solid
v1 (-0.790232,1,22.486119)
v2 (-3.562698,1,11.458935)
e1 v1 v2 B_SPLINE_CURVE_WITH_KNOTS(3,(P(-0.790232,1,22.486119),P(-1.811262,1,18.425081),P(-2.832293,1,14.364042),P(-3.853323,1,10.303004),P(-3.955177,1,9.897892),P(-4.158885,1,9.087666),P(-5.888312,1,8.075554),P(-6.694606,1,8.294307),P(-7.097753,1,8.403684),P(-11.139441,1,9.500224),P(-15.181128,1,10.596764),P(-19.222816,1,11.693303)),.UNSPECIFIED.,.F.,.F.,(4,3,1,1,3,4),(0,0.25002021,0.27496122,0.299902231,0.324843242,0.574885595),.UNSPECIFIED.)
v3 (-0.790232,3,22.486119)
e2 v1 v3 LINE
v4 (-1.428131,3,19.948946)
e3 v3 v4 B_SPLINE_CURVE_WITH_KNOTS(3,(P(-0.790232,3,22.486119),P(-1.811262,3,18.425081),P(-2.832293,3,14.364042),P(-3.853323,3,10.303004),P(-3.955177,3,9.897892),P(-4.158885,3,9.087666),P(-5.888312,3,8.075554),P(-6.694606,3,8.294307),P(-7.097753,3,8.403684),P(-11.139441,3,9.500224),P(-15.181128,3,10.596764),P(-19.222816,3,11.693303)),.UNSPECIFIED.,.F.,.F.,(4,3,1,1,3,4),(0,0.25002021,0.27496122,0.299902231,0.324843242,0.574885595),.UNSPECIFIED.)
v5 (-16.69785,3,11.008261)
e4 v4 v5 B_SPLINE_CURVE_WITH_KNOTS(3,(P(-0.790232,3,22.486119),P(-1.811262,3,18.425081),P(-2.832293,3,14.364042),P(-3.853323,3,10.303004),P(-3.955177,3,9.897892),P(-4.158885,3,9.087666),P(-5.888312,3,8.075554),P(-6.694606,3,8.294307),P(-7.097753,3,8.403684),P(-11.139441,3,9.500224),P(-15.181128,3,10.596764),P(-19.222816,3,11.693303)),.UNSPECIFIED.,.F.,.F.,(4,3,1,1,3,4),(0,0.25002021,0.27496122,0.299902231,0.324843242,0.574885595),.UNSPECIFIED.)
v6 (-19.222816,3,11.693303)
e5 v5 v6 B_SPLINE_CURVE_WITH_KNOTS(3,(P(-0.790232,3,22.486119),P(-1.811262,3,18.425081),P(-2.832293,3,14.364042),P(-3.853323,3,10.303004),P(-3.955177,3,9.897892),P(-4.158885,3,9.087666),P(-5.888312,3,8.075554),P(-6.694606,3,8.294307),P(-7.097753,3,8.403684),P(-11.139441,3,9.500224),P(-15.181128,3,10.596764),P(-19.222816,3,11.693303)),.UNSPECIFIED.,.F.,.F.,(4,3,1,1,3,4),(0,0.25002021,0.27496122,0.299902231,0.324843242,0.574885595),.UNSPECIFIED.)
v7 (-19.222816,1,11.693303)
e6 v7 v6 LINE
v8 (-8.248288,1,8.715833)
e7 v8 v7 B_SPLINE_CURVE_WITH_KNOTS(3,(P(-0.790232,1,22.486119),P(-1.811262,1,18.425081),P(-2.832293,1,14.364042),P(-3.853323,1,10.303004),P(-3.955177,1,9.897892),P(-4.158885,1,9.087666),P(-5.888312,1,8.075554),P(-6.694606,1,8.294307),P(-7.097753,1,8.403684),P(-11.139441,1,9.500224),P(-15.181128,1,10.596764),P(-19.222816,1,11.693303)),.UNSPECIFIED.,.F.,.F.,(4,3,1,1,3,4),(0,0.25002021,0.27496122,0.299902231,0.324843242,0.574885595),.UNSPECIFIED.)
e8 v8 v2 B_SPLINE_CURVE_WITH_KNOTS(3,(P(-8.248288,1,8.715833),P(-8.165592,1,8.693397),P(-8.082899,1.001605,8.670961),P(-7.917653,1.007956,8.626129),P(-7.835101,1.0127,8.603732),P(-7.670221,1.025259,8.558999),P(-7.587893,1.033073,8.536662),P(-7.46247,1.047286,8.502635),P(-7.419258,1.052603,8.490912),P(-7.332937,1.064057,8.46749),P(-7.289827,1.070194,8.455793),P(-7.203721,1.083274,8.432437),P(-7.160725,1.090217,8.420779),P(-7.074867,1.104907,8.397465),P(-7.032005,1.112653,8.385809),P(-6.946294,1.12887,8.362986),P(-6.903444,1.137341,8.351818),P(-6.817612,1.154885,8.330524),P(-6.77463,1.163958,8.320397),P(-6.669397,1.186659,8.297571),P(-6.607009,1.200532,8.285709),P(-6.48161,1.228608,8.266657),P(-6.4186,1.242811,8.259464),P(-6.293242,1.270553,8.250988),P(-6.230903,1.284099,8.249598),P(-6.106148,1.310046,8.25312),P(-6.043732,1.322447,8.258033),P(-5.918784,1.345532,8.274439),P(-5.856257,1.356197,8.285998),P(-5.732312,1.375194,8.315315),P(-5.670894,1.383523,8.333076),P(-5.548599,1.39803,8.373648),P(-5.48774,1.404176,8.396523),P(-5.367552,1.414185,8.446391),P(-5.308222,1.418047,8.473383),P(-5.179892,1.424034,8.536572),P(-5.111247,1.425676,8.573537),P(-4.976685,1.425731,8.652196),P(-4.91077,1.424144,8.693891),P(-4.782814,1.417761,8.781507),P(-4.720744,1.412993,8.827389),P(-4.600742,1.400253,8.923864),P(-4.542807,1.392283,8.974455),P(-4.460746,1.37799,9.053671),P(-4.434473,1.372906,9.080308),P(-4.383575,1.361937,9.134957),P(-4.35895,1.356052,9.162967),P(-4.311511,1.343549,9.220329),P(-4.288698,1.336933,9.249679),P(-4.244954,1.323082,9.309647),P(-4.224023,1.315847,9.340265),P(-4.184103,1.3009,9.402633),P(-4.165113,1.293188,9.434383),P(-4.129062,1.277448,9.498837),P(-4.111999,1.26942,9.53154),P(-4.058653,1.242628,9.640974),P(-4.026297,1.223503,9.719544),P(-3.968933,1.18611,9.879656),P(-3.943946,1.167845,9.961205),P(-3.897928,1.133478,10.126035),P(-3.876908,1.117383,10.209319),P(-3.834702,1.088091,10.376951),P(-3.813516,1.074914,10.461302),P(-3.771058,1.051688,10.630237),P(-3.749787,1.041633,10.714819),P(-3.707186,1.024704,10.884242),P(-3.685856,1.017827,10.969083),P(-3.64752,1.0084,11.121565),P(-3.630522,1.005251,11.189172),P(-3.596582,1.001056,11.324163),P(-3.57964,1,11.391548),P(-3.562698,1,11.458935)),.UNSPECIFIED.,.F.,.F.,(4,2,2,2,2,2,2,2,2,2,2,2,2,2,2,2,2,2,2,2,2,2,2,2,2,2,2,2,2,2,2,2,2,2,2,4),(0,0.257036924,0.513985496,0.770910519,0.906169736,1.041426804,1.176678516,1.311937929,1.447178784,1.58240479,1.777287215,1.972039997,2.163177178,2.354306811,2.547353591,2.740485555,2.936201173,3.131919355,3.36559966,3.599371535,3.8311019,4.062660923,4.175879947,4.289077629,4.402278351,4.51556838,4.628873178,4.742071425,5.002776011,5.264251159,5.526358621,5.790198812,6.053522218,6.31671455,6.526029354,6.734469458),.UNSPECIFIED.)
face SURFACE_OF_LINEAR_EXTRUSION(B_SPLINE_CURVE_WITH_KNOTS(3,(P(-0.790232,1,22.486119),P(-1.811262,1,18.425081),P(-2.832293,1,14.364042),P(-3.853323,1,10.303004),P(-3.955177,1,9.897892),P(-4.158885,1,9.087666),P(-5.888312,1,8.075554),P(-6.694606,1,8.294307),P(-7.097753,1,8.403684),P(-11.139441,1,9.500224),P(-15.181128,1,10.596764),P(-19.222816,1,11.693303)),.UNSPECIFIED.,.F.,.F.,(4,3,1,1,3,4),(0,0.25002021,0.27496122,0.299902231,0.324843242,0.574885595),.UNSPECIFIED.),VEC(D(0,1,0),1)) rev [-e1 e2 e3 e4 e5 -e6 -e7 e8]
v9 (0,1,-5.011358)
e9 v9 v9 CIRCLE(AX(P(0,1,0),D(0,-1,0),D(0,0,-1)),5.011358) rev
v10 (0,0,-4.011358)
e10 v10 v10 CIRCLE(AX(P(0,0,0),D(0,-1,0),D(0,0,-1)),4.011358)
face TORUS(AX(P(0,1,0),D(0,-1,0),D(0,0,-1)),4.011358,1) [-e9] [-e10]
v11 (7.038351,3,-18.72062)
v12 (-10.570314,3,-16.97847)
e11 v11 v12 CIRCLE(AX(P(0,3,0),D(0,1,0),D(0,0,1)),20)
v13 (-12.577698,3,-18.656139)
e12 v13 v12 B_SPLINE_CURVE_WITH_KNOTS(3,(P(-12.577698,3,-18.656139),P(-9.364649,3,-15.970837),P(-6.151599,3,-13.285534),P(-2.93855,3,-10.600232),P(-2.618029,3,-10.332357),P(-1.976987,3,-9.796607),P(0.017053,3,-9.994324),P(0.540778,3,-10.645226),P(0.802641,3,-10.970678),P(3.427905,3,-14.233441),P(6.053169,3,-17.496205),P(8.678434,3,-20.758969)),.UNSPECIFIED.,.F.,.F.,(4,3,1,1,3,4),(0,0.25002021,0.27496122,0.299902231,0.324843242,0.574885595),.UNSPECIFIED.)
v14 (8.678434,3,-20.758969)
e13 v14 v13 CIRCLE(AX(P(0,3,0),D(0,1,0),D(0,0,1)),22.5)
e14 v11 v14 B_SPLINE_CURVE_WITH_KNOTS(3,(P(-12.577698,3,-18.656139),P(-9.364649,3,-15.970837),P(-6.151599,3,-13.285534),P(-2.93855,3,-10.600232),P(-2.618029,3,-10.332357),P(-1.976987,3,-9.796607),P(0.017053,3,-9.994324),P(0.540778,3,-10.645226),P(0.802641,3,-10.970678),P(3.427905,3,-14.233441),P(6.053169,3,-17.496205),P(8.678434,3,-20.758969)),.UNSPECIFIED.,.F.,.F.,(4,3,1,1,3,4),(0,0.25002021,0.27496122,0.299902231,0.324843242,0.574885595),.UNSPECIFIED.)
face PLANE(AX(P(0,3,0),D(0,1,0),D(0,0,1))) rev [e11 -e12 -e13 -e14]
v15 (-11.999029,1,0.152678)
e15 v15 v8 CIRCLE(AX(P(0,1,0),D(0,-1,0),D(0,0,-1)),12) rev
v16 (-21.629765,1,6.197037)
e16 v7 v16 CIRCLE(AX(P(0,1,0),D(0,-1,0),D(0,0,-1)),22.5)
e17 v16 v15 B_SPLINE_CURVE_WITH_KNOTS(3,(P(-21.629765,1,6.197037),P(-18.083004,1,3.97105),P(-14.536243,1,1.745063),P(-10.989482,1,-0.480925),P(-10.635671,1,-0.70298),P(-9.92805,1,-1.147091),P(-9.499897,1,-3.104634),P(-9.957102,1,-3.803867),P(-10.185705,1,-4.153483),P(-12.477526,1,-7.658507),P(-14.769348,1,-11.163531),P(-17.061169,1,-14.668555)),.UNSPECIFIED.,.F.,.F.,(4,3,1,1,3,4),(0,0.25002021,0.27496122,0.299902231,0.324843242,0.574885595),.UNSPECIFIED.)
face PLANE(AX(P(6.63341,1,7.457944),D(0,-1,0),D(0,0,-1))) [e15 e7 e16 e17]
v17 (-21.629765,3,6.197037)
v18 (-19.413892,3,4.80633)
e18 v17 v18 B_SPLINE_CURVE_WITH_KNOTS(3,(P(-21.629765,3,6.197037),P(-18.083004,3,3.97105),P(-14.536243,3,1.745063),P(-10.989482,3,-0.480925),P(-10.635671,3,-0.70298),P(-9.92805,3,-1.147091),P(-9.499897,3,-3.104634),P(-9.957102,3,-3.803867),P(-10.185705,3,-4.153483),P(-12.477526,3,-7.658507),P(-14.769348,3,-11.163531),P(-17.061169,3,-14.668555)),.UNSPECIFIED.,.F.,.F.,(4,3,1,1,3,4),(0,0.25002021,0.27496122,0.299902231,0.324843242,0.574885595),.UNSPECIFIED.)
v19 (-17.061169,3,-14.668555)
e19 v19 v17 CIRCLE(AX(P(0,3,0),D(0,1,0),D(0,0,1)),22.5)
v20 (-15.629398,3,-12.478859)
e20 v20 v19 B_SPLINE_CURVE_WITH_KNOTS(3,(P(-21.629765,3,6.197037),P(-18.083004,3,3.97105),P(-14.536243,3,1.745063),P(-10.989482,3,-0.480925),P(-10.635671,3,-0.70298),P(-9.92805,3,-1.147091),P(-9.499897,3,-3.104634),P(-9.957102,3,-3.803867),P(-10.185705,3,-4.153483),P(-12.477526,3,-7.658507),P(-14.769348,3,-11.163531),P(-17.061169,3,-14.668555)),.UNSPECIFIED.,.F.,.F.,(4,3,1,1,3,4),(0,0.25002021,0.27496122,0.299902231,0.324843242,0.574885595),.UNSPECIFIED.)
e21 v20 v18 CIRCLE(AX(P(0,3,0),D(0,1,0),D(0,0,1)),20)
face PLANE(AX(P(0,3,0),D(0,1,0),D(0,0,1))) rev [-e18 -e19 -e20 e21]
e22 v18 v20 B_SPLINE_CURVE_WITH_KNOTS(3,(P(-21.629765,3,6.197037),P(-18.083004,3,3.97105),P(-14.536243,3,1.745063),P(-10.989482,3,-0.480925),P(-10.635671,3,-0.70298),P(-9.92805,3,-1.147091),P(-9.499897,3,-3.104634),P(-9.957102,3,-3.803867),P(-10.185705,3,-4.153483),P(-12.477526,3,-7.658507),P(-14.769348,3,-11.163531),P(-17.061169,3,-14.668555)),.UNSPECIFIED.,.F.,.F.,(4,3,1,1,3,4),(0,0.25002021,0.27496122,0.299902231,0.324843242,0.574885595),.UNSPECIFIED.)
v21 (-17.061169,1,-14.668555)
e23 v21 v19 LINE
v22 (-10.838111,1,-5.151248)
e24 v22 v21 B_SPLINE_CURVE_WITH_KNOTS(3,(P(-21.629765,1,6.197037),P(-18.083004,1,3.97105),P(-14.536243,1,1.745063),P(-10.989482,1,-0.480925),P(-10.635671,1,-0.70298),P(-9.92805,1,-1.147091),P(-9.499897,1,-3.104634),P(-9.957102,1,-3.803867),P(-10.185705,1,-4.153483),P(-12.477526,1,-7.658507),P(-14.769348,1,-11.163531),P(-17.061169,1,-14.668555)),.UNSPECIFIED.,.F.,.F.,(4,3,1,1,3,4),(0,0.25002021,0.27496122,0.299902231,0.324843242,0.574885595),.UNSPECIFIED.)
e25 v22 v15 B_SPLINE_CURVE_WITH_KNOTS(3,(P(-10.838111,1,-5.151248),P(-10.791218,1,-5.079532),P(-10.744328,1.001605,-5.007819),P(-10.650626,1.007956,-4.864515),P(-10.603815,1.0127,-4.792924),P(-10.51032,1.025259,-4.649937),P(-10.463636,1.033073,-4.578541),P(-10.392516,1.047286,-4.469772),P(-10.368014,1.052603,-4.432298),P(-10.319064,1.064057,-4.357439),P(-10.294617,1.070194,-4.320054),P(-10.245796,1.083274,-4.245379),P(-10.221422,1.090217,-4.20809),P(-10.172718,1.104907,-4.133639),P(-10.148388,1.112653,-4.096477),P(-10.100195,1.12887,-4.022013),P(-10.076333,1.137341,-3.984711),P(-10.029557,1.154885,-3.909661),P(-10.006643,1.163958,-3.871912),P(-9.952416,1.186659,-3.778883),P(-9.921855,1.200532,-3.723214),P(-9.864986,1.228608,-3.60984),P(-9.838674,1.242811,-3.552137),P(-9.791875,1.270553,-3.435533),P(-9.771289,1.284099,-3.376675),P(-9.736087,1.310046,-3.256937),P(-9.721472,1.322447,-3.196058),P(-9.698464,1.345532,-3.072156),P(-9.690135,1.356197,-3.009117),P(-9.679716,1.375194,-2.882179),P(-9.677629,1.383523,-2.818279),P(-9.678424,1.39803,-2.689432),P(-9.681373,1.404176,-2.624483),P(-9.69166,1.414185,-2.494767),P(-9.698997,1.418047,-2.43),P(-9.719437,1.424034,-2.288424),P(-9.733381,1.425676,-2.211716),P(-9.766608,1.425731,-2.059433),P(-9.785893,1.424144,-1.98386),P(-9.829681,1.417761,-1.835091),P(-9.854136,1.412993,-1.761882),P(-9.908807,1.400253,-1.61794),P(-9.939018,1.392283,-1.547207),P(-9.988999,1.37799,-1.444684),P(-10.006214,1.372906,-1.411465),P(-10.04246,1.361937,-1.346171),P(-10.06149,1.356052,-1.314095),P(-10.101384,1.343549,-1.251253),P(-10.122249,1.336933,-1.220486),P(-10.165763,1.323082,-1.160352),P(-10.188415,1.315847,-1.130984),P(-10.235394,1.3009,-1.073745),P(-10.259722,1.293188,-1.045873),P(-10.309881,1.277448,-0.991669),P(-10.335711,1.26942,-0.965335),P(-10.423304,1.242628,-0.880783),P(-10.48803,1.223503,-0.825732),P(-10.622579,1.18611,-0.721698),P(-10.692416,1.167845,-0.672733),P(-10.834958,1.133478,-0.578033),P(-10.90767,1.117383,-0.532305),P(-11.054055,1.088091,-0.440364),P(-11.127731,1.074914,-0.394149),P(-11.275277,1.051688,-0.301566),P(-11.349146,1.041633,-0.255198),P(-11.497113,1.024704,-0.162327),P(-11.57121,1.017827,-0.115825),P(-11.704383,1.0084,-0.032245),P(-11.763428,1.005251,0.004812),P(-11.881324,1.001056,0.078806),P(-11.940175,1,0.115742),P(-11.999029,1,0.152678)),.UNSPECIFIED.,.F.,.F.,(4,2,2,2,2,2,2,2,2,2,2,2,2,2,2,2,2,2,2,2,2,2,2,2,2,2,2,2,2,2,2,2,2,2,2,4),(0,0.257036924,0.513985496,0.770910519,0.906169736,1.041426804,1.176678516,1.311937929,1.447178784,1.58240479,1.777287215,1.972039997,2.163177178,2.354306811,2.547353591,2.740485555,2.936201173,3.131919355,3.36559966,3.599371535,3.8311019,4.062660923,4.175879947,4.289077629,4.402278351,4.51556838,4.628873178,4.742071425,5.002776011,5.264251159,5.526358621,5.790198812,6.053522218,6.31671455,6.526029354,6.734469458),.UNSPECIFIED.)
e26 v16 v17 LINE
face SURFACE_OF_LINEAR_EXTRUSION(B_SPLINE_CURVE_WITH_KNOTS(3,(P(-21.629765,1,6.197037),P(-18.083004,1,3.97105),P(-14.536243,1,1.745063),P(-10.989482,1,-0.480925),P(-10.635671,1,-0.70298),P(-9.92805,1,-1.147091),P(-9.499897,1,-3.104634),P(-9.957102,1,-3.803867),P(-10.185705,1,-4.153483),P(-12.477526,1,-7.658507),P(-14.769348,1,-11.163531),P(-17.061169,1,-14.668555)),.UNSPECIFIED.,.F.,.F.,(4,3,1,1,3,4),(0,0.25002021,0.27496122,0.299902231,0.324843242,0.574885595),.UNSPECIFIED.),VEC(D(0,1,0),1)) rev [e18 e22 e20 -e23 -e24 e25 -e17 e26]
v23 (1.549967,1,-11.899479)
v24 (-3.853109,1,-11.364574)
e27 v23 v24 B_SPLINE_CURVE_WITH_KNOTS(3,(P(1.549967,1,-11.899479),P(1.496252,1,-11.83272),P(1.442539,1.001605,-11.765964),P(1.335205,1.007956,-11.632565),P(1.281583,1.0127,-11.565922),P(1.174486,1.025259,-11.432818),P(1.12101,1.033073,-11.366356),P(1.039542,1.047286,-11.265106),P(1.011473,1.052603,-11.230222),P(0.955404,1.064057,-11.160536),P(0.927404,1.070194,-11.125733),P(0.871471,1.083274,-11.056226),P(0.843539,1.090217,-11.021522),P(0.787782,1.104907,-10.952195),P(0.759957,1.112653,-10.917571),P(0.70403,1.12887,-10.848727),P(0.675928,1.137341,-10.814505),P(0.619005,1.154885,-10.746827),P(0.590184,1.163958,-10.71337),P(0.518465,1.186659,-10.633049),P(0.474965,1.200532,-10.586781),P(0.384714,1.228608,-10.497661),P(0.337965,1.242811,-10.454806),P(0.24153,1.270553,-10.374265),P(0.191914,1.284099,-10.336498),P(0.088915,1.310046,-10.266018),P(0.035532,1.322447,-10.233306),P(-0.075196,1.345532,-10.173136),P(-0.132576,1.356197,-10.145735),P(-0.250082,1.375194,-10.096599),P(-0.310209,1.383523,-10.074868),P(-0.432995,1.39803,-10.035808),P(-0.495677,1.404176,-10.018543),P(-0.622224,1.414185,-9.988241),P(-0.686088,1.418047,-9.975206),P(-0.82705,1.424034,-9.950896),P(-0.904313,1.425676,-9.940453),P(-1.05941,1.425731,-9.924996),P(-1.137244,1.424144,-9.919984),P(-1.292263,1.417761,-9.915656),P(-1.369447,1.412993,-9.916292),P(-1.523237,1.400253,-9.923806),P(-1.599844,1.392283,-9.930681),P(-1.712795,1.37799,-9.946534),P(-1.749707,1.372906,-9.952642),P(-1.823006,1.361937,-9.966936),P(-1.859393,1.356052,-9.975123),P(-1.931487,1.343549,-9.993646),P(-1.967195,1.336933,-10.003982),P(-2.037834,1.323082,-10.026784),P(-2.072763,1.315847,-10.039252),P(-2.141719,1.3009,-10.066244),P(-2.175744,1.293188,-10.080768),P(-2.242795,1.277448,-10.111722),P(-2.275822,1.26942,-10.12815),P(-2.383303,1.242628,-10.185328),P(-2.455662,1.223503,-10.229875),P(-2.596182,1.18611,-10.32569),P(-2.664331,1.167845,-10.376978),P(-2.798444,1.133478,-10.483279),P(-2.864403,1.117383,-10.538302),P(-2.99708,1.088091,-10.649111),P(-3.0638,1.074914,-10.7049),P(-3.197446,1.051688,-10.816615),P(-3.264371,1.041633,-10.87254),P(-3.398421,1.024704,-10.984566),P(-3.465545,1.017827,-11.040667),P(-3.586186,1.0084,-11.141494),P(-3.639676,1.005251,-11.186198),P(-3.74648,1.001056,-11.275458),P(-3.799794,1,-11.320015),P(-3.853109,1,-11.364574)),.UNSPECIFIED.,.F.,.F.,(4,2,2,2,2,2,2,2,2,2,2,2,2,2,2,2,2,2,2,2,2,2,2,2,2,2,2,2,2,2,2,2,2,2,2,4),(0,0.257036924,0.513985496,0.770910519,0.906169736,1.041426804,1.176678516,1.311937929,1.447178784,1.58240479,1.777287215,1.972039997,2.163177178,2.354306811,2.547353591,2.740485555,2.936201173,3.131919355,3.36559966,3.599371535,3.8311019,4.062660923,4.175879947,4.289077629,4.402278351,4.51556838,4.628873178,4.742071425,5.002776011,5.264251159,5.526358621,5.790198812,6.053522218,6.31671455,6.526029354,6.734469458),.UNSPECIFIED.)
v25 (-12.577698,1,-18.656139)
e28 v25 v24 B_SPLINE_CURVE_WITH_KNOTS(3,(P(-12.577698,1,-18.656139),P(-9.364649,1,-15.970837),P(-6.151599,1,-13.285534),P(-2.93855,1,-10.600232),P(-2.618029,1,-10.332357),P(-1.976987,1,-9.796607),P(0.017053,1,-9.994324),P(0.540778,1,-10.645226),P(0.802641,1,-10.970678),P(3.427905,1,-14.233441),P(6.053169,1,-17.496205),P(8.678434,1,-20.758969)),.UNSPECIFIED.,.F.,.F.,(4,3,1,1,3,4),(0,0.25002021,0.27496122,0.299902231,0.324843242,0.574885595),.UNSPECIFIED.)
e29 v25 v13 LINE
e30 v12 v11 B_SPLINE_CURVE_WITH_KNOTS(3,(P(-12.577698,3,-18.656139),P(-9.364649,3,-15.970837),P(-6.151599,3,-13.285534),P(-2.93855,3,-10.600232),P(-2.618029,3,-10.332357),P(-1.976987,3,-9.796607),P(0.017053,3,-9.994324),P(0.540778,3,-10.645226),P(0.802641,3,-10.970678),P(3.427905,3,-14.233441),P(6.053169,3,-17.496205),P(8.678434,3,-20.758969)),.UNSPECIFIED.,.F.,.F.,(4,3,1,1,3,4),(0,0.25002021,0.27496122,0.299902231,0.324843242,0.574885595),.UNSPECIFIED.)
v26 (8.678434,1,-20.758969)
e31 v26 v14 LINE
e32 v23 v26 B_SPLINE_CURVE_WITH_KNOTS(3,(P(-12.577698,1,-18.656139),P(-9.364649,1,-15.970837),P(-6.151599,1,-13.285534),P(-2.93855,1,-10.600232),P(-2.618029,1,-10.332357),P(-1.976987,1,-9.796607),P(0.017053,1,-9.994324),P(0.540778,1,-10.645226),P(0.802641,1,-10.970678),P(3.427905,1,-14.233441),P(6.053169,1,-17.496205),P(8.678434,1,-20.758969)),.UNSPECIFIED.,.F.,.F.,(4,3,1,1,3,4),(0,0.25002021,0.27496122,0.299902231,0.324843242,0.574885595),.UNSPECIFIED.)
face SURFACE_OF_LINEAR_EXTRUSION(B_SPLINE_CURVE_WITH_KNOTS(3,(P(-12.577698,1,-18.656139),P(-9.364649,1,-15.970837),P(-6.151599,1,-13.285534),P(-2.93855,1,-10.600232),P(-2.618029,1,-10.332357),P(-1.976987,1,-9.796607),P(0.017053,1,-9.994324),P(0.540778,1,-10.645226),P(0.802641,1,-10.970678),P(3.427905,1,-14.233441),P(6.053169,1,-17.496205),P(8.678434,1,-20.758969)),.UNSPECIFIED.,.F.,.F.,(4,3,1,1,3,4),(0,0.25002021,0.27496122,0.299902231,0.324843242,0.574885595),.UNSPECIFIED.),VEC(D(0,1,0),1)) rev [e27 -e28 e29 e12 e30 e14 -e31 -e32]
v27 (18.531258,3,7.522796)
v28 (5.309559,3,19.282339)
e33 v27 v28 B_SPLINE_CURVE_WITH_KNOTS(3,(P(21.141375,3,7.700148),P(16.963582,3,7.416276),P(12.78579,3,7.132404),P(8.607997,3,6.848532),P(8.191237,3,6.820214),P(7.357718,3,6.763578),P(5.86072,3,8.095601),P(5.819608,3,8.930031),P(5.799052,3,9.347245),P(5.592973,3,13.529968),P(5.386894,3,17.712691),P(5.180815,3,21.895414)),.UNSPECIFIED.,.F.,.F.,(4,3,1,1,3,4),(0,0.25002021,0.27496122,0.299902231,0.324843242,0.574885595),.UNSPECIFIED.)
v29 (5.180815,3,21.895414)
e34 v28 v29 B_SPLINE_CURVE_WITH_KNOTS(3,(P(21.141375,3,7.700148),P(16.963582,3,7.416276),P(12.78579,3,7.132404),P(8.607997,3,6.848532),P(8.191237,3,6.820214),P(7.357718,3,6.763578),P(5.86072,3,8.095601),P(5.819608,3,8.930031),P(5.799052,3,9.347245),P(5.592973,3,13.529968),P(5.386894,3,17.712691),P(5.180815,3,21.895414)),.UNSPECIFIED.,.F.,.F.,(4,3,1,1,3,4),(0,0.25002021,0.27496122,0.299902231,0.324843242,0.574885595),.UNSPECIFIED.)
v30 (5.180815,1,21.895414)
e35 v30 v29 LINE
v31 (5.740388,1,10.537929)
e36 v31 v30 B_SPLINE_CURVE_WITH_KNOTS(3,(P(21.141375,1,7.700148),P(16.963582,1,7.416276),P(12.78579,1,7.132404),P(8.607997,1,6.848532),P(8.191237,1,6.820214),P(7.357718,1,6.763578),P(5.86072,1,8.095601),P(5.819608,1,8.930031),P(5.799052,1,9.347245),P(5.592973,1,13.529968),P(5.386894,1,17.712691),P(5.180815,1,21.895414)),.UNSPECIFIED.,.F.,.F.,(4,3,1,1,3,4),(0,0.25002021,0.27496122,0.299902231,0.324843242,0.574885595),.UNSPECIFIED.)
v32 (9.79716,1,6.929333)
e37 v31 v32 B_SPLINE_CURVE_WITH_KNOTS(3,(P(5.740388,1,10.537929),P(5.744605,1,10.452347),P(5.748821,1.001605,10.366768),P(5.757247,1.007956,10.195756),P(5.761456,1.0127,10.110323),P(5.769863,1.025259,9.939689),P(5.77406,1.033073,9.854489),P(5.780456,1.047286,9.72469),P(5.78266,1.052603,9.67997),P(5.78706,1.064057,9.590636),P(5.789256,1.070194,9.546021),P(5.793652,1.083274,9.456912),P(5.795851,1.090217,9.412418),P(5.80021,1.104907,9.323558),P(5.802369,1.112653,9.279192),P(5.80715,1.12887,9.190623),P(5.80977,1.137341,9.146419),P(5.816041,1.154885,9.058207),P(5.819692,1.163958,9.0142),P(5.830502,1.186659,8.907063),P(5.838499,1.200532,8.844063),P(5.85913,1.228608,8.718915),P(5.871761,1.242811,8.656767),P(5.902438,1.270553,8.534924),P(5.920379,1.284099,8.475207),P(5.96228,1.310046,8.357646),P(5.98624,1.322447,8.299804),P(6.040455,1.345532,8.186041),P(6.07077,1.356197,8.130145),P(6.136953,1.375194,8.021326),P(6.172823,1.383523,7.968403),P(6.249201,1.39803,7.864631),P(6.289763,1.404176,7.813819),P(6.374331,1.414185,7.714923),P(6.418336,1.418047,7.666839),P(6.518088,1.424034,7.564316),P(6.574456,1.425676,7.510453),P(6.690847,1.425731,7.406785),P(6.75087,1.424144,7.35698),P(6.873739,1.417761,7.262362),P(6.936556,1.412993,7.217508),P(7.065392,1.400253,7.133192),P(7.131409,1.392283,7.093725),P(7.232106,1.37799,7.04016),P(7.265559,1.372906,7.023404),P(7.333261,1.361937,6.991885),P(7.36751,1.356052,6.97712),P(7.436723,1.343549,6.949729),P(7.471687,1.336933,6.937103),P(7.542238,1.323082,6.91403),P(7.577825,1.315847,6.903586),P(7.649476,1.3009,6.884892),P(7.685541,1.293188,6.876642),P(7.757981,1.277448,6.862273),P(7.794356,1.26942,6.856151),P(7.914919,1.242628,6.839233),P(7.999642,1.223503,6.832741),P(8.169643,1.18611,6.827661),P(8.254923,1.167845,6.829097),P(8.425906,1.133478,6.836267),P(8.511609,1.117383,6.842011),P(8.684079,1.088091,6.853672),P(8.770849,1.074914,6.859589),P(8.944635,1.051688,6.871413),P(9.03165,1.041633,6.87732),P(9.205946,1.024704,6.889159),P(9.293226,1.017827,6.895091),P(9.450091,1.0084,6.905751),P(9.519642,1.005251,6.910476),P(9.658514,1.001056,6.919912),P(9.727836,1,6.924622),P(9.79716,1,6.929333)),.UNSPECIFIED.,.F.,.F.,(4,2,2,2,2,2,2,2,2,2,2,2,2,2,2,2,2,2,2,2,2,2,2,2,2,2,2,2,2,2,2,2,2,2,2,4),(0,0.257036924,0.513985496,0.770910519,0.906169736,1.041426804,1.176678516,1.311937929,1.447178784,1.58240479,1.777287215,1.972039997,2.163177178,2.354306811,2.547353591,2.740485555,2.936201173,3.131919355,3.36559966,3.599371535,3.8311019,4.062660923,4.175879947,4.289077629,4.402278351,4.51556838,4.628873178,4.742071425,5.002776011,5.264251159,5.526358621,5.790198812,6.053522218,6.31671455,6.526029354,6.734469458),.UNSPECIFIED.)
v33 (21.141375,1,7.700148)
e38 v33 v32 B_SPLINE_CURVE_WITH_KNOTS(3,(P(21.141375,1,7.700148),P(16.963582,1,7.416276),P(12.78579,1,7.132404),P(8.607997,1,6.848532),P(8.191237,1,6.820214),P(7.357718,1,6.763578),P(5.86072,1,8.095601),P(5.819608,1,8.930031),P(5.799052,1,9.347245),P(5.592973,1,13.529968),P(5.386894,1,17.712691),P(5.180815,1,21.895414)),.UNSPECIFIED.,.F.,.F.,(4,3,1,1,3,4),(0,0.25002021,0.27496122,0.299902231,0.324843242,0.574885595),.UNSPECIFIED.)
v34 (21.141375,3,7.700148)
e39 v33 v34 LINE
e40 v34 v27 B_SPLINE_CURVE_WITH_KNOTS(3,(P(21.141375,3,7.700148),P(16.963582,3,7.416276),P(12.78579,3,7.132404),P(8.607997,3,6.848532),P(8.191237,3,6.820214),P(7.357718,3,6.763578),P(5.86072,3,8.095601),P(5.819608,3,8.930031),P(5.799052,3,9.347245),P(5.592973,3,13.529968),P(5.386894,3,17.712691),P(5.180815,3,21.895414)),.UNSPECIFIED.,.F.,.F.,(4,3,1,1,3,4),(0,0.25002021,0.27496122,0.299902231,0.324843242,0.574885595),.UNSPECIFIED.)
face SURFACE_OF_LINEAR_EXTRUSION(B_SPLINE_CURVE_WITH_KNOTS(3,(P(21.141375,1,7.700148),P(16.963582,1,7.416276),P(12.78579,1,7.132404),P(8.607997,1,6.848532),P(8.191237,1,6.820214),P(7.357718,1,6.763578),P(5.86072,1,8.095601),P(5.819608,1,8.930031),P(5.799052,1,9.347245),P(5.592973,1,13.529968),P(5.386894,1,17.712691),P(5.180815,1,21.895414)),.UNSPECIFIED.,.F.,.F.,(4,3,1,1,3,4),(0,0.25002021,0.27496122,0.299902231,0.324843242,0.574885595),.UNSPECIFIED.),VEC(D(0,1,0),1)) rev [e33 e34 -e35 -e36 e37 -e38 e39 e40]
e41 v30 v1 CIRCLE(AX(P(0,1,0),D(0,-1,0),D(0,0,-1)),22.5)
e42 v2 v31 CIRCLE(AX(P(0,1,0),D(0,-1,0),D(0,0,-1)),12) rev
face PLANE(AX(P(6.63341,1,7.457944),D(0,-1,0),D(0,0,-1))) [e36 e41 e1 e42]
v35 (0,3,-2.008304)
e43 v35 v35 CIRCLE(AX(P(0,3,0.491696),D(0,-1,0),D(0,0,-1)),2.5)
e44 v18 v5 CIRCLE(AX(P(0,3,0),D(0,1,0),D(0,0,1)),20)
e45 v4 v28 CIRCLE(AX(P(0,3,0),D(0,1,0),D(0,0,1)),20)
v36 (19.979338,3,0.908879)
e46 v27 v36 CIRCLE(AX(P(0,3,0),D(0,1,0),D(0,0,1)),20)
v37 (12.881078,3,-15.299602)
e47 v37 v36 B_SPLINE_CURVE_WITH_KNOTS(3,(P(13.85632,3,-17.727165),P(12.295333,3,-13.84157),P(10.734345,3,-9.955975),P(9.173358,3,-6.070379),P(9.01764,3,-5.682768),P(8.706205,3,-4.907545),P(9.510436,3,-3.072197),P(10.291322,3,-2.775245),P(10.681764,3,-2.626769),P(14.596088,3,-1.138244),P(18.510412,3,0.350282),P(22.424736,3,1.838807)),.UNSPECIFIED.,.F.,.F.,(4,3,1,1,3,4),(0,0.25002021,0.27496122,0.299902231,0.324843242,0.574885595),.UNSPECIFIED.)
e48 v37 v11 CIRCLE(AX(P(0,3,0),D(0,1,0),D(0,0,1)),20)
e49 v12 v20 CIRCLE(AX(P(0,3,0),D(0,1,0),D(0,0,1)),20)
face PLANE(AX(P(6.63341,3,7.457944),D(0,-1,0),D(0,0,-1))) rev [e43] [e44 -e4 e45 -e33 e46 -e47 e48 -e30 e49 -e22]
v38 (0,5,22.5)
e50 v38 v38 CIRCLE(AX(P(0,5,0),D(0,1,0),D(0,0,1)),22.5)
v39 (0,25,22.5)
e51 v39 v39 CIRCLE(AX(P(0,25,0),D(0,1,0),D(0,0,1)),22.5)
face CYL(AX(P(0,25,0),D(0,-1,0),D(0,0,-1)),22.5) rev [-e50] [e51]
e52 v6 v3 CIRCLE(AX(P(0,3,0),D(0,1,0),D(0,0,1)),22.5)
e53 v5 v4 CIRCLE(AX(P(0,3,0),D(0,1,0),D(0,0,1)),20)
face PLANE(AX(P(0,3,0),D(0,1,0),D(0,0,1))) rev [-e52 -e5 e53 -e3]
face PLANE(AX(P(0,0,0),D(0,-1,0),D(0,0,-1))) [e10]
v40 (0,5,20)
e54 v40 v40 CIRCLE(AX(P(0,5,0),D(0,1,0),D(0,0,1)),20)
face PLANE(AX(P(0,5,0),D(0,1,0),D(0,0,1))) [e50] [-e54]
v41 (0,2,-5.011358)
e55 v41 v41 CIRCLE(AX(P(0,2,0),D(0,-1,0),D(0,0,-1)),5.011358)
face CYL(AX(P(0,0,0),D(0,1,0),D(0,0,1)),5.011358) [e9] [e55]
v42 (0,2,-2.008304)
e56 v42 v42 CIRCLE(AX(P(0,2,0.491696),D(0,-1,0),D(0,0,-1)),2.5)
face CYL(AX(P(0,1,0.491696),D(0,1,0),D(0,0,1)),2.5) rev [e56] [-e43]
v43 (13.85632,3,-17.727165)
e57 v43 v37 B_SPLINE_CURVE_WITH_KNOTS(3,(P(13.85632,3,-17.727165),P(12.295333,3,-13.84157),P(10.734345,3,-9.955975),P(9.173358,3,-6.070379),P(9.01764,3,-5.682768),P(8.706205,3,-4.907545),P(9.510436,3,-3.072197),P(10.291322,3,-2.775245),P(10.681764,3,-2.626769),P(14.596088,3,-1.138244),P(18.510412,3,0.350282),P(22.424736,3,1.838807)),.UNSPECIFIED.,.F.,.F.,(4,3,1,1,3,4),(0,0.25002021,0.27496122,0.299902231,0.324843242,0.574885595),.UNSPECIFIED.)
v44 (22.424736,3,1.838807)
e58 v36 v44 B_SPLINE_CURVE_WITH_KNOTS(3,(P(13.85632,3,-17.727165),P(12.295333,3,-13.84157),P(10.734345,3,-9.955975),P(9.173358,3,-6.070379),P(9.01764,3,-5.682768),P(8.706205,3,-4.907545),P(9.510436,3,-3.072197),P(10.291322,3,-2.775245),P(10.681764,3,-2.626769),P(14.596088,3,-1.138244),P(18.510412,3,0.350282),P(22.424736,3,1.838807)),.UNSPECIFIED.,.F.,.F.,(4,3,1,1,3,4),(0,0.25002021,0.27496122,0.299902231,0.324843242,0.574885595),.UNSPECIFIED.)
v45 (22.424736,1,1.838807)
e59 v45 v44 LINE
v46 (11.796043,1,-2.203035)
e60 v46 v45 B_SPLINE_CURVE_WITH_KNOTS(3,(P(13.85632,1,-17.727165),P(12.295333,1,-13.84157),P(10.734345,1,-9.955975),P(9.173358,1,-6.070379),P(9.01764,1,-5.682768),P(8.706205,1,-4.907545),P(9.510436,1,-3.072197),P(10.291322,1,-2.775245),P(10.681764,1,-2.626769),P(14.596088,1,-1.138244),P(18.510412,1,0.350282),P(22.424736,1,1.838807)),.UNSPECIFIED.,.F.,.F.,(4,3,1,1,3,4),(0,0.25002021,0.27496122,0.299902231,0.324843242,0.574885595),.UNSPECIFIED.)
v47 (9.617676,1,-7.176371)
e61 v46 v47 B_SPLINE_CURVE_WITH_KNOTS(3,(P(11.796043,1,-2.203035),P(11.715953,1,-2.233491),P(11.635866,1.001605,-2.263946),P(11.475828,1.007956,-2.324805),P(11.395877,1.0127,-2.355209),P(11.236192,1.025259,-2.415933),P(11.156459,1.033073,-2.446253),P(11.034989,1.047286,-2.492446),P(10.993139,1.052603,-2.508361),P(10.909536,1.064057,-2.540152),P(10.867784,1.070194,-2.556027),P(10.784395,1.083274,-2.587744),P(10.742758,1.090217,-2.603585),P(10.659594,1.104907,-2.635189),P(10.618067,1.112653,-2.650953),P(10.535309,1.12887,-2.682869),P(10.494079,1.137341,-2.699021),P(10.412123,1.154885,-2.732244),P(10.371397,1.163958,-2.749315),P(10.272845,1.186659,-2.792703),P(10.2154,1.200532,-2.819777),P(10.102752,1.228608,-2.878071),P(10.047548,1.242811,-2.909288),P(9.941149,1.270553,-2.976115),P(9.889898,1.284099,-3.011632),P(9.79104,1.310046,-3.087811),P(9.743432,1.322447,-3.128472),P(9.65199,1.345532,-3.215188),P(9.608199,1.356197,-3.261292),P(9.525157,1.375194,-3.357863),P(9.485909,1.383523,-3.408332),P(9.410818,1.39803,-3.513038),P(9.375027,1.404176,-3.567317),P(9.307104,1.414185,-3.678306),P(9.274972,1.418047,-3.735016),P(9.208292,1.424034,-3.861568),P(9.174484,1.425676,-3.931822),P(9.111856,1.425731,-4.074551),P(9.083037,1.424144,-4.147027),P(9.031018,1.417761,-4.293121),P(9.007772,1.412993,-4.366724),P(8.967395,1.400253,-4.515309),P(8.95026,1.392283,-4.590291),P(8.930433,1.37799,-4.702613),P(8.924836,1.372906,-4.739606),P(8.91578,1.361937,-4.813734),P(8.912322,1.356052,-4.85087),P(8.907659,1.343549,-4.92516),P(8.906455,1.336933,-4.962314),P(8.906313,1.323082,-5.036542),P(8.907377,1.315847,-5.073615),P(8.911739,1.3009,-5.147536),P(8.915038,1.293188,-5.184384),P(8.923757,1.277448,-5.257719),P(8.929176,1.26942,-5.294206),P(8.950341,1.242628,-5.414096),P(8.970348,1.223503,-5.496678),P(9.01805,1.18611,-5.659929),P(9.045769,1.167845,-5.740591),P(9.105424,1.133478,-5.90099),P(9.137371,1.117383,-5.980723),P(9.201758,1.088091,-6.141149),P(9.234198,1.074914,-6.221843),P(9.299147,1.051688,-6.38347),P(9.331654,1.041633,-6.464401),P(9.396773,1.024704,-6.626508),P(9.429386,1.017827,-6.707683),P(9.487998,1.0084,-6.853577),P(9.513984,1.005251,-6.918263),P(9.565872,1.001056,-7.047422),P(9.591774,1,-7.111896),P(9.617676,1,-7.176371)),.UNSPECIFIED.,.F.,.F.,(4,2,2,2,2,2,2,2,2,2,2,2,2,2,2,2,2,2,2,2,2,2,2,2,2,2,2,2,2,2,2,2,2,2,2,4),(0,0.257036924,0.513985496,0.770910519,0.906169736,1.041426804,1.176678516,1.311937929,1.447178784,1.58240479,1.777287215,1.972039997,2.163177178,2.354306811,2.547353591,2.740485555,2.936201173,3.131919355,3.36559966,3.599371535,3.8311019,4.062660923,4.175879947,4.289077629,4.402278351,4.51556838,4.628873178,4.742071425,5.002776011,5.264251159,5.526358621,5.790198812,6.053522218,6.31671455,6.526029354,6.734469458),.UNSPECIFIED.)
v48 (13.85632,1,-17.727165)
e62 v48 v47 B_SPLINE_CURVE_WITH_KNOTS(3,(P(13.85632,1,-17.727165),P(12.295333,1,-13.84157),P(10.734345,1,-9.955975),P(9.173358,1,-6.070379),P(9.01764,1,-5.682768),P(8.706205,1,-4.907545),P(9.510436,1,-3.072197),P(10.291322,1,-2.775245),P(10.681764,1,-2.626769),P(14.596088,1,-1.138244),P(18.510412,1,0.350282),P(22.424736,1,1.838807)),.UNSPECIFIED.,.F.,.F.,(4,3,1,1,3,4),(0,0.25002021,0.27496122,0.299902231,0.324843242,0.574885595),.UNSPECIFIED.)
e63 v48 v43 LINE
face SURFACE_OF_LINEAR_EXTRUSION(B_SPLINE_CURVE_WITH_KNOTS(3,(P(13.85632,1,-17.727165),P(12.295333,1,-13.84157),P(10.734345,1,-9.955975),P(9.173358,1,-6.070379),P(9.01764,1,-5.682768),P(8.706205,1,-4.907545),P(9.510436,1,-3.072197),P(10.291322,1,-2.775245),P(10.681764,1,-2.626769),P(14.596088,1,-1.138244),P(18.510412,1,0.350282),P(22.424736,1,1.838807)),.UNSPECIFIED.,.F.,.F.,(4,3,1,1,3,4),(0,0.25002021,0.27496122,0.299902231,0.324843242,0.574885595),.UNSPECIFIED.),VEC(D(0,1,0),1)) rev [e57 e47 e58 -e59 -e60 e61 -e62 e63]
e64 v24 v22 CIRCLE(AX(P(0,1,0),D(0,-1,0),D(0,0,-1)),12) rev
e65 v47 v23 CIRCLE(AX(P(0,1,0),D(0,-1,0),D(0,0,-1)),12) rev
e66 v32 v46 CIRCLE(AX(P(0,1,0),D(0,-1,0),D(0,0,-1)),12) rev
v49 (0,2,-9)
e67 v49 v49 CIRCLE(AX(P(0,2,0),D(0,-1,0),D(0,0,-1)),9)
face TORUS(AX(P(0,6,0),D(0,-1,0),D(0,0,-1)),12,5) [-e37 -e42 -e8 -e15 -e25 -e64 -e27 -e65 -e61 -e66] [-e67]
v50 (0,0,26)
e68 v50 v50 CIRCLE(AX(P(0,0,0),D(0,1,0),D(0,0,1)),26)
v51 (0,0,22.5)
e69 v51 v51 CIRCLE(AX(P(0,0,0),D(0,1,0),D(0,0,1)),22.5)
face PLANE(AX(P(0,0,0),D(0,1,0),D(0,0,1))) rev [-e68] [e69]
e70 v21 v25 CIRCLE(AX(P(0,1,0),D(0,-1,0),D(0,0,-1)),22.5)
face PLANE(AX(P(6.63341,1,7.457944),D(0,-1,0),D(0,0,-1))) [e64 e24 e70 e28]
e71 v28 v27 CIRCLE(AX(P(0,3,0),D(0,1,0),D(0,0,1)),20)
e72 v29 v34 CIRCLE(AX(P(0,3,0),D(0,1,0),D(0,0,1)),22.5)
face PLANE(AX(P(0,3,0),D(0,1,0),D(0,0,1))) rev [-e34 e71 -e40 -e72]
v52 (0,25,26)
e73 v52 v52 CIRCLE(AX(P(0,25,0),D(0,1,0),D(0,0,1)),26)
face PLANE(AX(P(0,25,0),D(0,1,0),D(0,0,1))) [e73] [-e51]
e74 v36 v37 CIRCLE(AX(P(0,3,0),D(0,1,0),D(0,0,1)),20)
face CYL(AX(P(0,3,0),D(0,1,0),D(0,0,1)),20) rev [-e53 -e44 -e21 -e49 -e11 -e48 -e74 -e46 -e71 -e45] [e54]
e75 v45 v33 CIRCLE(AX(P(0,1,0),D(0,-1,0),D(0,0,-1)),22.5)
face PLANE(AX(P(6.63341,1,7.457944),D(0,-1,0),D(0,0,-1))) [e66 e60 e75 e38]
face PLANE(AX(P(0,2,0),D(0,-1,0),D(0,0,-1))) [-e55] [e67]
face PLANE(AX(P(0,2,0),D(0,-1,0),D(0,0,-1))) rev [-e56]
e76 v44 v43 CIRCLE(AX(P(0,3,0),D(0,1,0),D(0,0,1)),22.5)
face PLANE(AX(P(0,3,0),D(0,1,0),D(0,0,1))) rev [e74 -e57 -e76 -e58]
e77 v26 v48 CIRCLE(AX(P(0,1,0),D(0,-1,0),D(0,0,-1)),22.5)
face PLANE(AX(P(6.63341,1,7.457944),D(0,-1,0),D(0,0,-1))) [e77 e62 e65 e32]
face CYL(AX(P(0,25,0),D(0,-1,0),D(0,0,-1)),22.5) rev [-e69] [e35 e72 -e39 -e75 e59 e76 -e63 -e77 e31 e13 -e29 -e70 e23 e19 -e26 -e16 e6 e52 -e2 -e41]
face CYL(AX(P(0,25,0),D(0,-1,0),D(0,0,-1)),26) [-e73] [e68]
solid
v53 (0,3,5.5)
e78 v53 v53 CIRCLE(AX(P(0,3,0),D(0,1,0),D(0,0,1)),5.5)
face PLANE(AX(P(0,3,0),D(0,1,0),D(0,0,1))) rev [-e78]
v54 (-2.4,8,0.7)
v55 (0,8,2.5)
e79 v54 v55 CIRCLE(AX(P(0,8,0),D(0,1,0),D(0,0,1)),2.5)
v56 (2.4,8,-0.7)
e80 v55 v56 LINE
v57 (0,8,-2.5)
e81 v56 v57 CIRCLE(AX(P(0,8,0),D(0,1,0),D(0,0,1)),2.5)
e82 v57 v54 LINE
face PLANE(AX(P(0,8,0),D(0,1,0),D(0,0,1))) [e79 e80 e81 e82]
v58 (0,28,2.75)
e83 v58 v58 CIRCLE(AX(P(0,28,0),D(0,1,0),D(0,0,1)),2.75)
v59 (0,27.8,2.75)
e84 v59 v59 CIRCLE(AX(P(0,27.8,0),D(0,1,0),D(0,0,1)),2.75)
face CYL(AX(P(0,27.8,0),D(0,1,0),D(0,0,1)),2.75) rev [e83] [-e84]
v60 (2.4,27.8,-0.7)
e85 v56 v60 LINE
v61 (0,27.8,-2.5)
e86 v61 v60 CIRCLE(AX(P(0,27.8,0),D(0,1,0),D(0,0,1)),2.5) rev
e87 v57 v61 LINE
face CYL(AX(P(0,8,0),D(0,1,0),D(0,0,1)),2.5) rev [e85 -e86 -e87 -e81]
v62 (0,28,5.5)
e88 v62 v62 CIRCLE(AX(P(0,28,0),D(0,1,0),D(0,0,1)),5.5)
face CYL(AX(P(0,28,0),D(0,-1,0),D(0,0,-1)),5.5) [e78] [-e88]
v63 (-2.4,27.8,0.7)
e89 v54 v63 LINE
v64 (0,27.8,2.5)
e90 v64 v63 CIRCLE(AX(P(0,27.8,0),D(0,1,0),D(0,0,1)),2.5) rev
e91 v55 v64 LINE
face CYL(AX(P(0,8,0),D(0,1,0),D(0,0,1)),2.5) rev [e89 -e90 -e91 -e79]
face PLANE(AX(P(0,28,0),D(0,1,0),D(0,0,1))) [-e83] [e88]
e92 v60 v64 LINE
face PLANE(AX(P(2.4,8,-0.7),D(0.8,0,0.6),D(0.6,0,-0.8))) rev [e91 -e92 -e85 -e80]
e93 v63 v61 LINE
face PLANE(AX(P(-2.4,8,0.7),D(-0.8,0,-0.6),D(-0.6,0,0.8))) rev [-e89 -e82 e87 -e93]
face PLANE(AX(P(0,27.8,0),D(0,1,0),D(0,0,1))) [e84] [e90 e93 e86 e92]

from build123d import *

# Parameters (mm, degrees)
SKETCH1_R           = 26
SKETCH1_R_2         = 22.5
BOSS_EXTRUDE1_DEPTH = 25
BOSS_EXTRUDE2_START = -2
SKETCH3_R           = 22.5
SKETCH3_R_2         = 20
BOSS_EXTRUDE2_DEPTH = 2
BOSS_EXTRUDE3_START = 2
SKETCH4_R           = 2.5
BOSS_EXTRUDE3_DEPTH = 2
SKETCH5_R           = 5.5
BOSS_EXTRUDE4_DEPTH = 25
CUT_EXTRUDE1_DEPTH  = 20
SKETCH7_R           = 9
CUT_EXTRUDE2_DEPTH  = 1
FILLET5_R           = 5
SKETCH8_R           = 5.011357572
BOSS_EXTRUDE5_DEPTH = 2
FILLET6_R           = 1
SKETCH9_R           = 2.75
CUT_EXTRUDE3_DEPTH  = 0.2


with BuildPart() as part:
    # Sketch1 → Boss-Extrude1 (new body)
    with BuildSketch(Plane(origin=(0, 0, 0), x_dir=(1, 0, 0), z_dir=(0, 1, 0))):
        with Locations(Location((0, 0, 0), (0, 0, 270))):
            Circle(SKETCH1_R)
        with Locations(Location((0, 0, 0), (0, 0, 270))):
            Circle(SKETCH1_R_2, mode=Mode.SUBTRACT)
    extrude(amount=BOSS_EXTRUDE1_DEPTH)

    # Sketch3 → Boss-Extrude2 (add)
    with BuildSketch(Plane(origin=(0, 5, 0), x_dir=(1, 0, 0), z_dir=(0, 1, 0)).offset(BOSS_EXTRUDE2_START)):
        with Locations(Location((0, 0, 0), (0, 0, 270))):
            Circle(SKETCH3_R)
        with Locations(Location((0, 0, 0), (0, 0, 270))):
            Circle(SKETCH3_R_2, mode=Mode.SUBTRACT)
    extrude(amount=BOSS_EXTRUDE2_DEPTH)

    # Sketch4 → Boss-Extrude3 (add)
    with BuildSketch(Plane.XZ.offset(-3).offset(BOSS_EXTRUDE3_START)):
        with BuildLine():
            ThreePointArc((8.678433718, -20.758968862), (11.368893562, -19.41644301), (13.85632013, -17.727165381))
            add(Edge.make_bspline(
                [(13.85632013, -17.727165381), (12.295332772, -13.841569941), (10.734345415, -9.955974501), (9.173358058, -6.070379061), (9.017640236, -5.682767684), (8.706204592, -4.907544931), (9.510436229, -3.072197276), (10.29132151, -2.775244997), (10.681764151, -2.626768858), (14.596088137, -1.138243647), (18.510412124, 0.350281564), (22.424736111, 1.838806775)],
                knots=[0, 0, 0, 0, 0.25002021, 0.25002021, 0.25002021, 0.27496122, 0.299902231, 0.324843242, 0.324843242, 0.324843242, 0.574885595, 0.574885595, 0.574885595, 0.574885595], degree=3))
            ThreePointArc((22.424736111, 1.838806775), (21.979315966, 4.812449445), (21.141374551, 7.700148186))
            add(Edge.make_bspline(
                [(21.141374551, 7.700148186), (16.963582067, 7.416276013), (12.785789582, 7.132403839), (8.607997098, 6.848531665), (8.191237319, 6.820213718), (7.357717761, 6.763577825), (5.860719657, 8.09560118), (5.81960808, 8.930030516), (5.799052291, 9.347245184), (5.592973323, 13.529968105), (5.386894355, 17.712691026), (5.180815387, 21.895413947)],
                knots=[0, 0, 0, 0, 0.25002021, 0.25002021, 0.25002021, 0.27496122, 0.299902231, 0.324843242, 0.324843242, 0.324843242, 0.574885595, 0.574885595, 0.574885595, 0.574885595], degree=3))
            ThreePointArc((5.180815387, 21.895413947), (2.215070754, 22.390700336), (-0.790232088, 22.486118679))
            add(Edge.make_bspline(
                [(-0.790232088, 22.486118679), (-1.811262484, 18.425080587), (-2.83229288, 14.364042495), (-3.853323276, 10.303004403), (-3.955177163, 9.897891573), (-4.158884936, 9.087665912), (-5.888312283, 8.075553965), (-6.694605915, 8.294307376), (-7.097752732, 8.403684082), (-11.139440525, 9.500223802), (-15.181128319, 10.596763522), (-19.222816112, 11.693303242)],
                knots=[0, 0, 0, 0, 0.25002021, 0.25002021, 0.25002021, 0.27496122, 0.299902231, 0.324843242, 0.324843242, 0.324843242, 0.574885595, 0.574885595, 0.574885595, 0.574885595], degree=3))
            ThreePointArc((-19.222816112, 11.693303242), (-20.610326953, 9.025764395), (-21.629764841, 6.197037432))
            add(Edge.make_bspline(
                [(-17.061169104, -14.668555103), (-14.769347644, -11.163530998), (-12.477526184, -7.658506894), (-10.185704723, -4.15348279), (-9.957102077, -3.803866644), (-9.499896784, -3.104634352), (-9.928050007, -1.147091413), (-10.635671237, -0.702980309), (-10.989481852, -0.480924757), (-14.536242848, 1.745062639), (-18.083003844, 3.971050036), (-21.629764841, 6.197037432)],
                knots=[0, 0, 0, 0, 0.250042353, 0.250042353, 0.250042353, 0.274983364, 0.299924375, 0.324865386, 0.324865386, 0.324865386, 0.574885595, 0.574885595, 0.574885595, 0.574885595], degree=3))
            ThreePointArc((-17.061169104, -14.668555103), (-14.95295333, -16.812471166), (-12.577697752, -18.656138916))
            add(Edge.make_bspline(
                [(8.678433718, -20.758968862), (6.053169483, -17.496205114), (3.427905248, -14.233441366), (0.802641014, -10.970677618), (0.540778402, -10.645226251), (0.01705318, -9.994323517), (-1.97698741, -9.796607394), (-2.618029155, -10.332357297), (-2.938550027, -10.600232249), (-6.151599269, -13.285534472), (-9.36464851, -15.970836694), (-12.577697752, -18.656138916)],
                knots=[0, 0, 0, 0, 0.250042353, 0.250042353, 0.250042353, 0.274983364, 0.299924375, 0.324865386, 0.324865386, 0.324865386, 0.574885595, 0.574885595, 0.574885595, 0.574885595], degree=3))
        make_face()
        with Locations(Location((0, 0.491696266, 0), (0, 0, 270))):
            Circle(SKETCH4_R, mode=Mode.SUBTRACT)
    extrude(amount=-BOSS_EXTRUDE3_DEPTH)

    # Sketch7 → Cut-Extrude2 (cut)
    with BuildSketch(Plane.XZ.offset(-1)):
        with Locations(Location((0, 0, 0), (0, 0, 270))):
            Circle(SKETCH7_R)
    extrude(amount=-CUT_EXTRUDE2_DEPTH, mode=Mode.SUBTRACT)

    # Fillet5
    # the kernel refuses this fillet: 5 mm, written as the material it takes off along each edge
    with BuildSketch(Plane(origin=(0, 1, 0), x_dir=(0, 0, -1), z_dir=(-1, 0, 0))) as fillet5_piece_1:
        with BuildLine():
            CenterArc((12, -5), FILLET5_R, 90, 36.869897646)
            Line((9, -1), (8.94, -0.92))
            ThreePointArc((8.94, -0.92), (8.9, -0.5), (8.9, 0))
            Line((8.9, 0), (9, 0.1))
            Line((9, 0.1), (12, 0.1))
            Line((12, 0.1), (12, 0))
        make_face()
    revolve(axis=Axis((0, 1, 0), (0, -1, 0)), mode=Mode.SUBTRACT)

    # Sketch8 → Boss-Extrude5 (add)
    with BuildSketch(Plane.XZ.offset(-2)):
        with Locations(Location((0, 0, 0), (0, 0, 270))):
            Circle(SKETCH8_R)
    extrude(amount=BOSS_EXTRUDE5_DEPTH)

    # Fillet6
    fillet6_edges = [part.edges().sort_by_distance(p)[0] for p in [
        (0, 0, 5.011357572),
    ]]
    fillet(fillet6_edges, radius=FILLET6_R)


with BuildPart() as body_2:
    # Sketch5 → Boss-Extrude4 (new body)
    with BuildSketch(Plane(origin=(0, 3, 0), x_dir=(1, 0, 0), z_dir=(0, 1, 0))):
        with Locations(Location((0, 0, 0), (0, 0, 270))):
            Circle(SKETCH5_R)
    extrude(amount=BOSS_EXTRUDE4_DEPTH)

    # Sketch6 → Cut-Extrude1 (cut)
    with BuildSketch(Plane(origin=(0, 28, 0), x_dir=(1, 0, 0), z_dir=(0, 1, 0))):
        with BuildLine():
            Line((-2.4, -0.7), (0, 2.5))
            ThreePointArc((0, 2.5), (1.5, 2), (2.4, 0.7))
            Line((2.4, 0.7), (0, -2.5))
            ThreePointArc((0, -2.5), (-1.5, -2), (-2.4, -0.7))
        make_face()
    extrude(amount=-CUT_EXTRUDE1_DEPTH, mode=Mode.SUBTRACT)

    # Sketch9 → Cut-Extrude3 (cut)
    with BuildSketch(Plane(origin=(0, 28, 0), x_dir=(1, 0, 0), z_dir=(0, 1, 0))):
        with Locations(Location((0, 0, 0), (0, 0, 270))):
            Circle(SKETCH9_R)
    extrude(amount=-CUT_EXTRUDE3_DEPTH, mode=Mode.SUBTRACT)


solid = Compound([part.part, body_2.part])
